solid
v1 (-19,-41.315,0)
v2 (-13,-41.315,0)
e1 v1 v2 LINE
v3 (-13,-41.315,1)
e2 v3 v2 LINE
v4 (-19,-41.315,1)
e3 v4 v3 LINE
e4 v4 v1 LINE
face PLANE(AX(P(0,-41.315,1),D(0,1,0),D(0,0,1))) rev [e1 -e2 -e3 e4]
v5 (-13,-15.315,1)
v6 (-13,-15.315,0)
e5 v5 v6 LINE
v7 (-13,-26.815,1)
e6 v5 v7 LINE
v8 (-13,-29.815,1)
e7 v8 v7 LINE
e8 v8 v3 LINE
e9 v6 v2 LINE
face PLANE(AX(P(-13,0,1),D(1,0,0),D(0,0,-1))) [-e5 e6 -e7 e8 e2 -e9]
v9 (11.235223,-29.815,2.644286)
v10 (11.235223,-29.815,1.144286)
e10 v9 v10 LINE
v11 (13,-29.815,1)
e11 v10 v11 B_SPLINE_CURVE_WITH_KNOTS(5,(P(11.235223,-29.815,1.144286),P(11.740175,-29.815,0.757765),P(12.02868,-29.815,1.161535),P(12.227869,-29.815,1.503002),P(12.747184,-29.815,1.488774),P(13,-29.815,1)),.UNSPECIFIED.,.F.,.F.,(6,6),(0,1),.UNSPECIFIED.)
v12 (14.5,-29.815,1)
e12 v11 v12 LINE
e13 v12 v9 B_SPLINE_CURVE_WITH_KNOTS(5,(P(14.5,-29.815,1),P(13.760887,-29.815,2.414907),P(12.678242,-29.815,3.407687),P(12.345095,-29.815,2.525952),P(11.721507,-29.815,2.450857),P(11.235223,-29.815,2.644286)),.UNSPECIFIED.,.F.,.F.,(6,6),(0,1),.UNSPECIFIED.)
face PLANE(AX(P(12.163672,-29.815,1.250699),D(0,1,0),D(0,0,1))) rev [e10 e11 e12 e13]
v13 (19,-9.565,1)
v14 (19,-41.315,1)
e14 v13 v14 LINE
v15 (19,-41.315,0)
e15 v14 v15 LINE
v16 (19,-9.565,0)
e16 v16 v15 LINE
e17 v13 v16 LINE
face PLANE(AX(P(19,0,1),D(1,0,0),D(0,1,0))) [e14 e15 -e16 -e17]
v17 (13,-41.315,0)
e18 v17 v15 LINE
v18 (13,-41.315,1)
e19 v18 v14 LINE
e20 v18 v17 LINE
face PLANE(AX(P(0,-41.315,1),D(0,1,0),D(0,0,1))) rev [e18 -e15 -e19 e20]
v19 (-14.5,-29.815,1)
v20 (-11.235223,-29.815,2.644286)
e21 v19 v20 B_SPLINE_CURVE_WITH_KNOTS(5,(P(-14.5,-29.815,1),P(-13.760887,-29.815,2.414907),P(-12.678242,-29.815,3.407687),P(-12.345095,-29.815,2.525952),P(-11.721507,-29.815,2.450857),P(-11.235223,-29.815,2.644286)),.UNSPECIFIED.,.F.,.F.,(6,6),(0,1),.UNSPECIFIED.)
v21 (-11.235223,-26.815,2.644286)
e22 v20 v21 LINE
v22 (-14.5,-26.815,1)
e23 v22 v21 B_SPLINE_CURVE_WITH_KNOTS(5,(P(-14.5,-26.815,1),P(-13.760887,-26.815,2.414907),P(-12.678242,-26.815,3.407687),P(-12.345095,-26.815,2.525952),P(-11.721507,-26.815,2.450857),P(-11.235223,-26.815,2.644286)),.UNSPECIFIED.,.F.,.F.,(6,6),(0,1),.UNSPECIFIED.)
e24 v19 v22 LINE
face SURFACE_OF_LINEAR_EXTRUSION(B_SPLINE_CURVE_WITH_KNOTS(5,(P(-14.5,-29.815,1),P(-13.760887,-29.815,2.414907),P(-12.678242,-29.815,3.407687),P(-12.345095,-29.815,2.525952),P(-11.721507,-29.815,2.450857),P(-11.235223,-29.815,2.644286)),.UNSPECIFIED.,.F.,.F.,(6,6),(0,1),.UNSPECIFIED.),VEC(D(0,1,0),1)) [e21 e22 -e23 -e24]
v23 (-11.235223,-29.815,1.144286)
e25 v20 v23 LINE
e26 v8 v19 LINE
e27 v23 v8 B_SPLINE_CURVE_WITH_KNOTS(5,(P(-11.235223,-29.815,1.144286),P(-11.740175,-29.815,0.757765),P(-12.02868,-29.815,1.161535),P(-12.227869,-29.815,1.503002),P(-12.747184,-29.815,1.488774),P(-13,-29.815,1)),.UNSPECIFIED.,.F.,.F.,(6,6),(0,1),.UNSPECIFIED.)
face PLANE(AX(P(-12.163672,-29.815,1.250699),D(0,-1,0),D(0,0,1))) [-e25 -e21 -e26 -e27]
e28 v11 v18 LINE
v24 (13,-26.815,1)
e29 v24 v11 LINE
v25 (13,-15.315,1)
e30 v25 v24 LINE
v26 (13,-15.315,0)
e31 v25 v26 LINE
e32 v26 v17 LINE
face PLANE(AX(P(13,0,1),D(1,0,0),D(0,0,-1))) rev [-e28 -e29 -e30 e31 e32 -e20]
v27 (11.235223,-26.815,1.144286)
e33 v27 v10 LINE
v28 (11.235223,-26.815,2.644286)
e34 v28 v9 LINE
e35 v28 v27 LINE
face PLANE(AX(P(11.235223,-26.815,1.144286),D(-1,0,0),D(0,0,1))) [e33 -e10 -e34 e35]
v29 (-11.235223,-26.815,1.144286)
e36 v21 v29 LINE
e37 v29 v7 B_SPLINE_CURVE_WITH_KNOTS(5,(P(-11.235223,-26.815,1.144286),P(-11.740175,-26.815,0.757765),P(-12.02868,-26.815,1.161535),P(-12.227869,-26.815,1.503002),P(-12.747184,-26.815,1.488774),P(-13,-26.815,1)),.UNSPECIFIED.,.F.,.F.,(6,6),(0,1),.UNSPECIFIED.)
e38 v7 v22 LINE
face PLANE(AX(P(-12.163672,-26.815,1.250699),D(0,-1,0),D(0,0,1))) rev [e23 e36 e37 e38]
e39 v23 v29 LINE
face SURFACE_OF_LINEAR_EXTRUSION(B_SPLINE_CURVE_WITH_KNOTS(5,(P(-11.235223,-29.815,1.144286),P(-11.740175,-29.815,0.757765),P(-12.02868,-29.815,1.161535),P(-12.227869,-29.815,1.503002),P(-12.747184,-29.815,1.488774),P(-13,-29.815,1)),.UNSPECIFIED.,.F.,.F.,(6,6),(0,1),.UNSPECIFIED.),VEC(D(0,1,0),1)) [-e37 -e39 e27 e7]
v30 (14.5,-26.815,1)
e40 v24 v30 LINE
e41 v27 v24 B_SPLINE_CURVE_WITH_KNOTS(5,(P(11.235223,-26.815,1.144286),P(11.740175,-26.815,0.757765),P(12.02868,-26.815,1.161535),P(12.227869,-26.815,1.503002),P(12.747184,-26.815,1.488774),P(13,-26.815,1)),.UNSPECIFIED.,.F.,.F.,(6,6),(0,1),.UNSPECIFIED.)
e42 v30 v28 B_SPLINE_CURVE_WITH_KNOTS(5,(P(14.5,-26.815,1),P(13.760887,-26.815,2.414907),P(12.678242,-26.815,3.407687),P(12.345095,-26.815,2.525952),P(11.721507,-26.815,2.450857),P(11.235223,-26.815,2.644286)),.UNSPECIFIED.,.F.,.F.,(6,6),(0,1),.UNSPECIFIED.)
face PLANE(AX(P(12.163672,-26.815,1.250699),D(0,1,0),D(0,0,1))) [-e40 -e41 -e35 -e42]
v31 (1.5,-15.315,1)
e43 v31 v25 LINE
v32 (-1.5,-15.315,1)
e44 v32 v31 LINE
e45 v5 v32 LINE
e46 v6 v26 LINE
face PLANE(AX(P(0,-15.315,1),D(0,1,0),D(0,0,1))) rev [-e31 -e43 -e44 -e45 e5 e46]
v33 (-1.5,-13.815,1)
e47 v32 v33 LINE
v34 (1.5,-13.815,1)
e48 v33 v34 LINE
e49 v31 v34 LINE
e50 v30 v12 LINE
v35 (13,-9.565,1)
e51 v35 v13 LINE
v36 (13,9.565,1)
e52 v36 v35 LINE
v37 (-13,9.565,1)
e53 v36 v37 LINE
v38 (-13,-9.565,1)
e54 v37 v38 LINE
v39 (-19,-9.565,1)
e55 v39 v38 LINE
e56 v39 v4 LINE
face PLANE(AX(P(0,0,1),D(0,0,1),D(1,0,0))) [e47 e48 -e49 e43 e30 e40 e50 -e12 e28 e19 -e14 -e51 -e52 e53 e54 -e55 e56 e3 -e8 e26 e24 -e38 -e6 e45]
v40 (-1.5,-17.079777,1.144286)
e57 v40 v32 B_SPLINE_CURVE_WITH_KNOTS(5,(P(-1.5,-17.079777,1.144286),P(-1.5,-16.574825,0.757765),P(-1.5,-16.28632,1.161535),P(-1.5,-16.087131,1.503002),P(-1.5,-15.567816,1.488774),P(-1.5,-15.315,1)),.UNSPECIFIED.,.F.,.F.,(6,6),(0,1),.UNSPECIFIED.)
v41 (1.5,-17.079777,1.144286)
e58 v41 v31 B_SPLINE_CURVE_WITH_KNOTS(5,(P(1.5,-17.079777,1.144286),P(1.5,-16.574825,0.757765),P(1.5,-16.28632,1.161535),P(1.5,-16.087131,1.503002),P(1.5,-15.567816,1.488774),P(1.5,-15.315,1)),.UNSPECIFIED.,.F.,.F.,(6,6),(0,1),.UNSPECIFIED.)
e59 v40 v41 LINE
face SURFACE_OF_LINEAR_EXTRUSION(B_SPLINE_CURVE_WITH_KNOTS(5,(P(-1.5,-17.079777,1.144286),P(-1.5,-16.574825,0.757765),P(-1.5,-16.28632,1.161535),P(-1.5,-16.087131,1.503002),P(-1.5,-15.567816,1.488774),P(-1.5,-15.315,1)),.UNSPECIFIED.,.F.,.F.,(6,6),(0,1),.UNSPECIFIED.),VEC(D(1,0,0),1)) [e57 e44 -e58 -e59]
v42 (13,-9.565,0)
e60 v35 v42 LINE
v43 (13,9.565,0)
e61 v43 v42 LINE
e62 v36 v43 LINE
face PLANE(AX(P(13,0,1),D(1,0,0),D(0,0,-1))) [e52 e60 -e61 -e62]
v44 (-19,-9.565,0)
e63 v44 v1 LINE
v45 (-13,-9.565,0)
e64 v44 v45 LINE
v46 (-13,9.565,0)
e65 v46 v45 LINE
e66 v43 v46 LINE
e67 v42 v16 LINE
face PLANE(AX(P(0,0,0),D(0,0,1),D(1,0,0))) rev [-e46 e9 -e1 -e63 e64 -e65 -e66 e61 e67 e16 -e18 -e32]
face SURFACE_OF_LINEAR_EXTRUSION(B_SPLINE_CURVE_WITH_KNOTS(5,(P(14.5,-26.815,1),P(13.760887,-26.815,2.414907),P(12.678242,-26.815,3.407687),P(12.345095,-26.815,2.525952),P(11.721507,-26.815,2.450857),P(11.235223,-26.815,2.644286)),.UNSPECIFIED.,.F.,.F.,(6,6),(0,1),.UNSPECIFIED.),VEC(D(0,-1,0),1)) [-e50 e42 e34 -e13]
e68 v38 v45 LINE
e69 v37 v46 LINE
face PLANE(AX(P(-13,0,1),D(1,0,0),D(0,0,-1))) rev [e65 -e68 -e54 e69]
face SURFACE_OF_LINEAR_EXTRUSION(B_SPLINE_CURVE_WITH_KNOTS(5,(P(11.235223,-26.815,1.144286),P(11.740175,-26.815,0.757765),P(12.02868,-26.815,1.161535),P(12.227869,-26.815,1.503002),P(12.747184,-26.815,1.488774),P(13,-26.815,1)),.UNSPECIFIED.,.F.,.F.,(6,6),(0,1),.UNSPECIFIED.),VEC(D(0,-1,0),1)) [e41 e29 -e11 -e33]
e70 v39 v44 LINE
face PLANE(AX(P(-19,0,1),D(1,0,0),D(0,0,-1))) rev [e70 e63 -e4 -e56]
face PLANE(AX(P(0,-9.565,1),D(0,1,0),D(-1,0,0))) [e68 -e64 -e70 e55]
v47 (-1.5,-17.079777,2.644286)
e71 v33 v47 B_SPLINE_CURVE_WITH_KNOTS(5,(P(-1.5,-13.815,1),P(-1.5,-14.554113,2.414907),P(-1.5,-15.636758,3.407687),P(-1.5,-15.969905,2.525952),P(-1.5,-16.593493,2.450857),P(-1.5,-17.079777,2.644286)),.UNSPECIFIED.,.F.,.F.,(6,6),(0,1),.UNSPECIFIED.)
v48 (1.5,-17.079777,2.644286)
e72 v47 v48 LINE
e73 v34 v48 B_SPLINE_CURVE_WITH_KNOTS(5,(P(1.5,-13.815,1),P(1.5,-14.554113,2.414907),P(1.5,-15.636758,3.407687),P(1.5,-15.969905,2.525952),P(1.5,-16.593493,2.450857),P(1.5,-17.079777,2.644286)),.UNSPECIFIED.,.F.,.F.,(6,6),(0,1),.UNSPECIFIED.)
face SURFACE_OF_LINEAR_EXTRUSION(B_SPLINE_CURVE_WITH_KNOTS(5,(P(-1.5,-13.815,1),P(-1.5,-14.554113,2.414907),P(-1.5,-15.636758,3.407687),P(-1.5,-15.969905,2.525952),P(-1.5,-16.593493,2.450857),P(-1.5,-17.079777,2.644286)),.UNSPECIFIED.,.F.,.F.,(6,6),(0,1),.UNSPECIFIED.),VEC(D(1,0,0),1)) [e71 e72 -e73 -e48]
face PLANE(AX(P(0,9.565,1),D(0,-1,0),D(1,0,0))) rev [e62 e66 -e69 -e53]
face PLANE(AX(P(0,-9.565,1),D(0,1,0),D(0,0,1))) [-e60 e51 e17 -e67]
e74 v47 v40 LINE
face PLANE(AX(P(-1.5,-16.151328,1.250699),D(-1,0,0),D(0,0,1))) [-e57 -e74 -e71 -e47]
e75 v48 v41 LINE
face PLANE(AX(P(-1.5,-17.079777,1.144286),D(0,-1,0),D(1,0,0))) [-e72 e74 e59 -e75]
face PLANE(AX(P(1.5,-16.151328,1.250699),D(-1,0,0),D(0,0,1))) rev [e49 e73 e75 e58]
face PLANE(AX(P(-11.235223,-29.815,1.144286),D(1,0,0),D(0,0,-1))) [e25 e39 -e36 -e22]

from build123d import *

# Parameters (mm, degrees)
BOSS_EXTRUDE1_DEPTH = 1
BOSS_EXTRUDE2_START = -1.5
BOSS_EXTRUDE2_DEPTH = 3
CIRPATTERN1_COUNT   = 3
CIRPATTERN1_ANGLE   = 180


# Read off the part's stored shape, not the designer's step: Boss-Extrude2
with BuildPart() as part:
    # Sketch1 → Boss-Extrude1 (new body)
    with BuildSketch(Plane.XY):
        Polygon((13, -9.565), (13, 9.565), (-13, 9.565), (-13, -9.565), (-19, -9.565), (-19, -41.315), (-13, -41.315), (-13, -15.315), (13, -15.315), (13, -41.315), (19, -41.315), (19, -9.565), align=None)
    extrude(amount=BOSS_EXTRUDE1_DEPTH)

    # Boss-Extrude2 outline → Boss-Extrude2 (add)
    with BuildSketch(Plane(origin=(0, -28.315, 0), x_dir=(-1, 0, 0), z_dir=(0, -1, 0)).offset(BOSS_EXTRUDE2_START)):
        with BuildLine():
            Line((-11.23522271, -2.644286359), (-11.23522271, -1.144286359))
            add(Edge.make_bspline(
                [(-11.23522271, -1.144286359), (-11.740174878, -0.757764956), (-12.028679887, -1.161534837), (-12.227869222, -1.503002268), (-12.747184273, -1.488774458), (-13, -1)],
                knots=[0, 0, 0, 0, 0, 0, 1, 1, 1, 1, 1, 1], degree=5))
            Line((-13, -1), (-14.5, -1))
            add(Edge.make_bspline(
                [(-14.5, -1), (-13.760887065, -2.414906572), (-12.67824158, -3.40768712), (-12.345095428, -2.525951835), (-11.7215069, -2.450856602), (-11.23522271, -2.644286359)],
                knots=[0, 0, 0, 0, 0, 0, 1, 1, 1, 1, 1, 1], degree=5))
        make_face()
    boss_extrude2 = extrude(amount=BOSS_EXTRUDE2_DEPTH)

    # CirPattern1: Boss-Extrude2 ×3 about axis
    cirpattern1_axis = Axis((0, -28.315, 1.05), (0, 0, 1))
    for i in range(1, CIRPATTERN1_COUNT):
        add(boss_extrude2.rotate(cirpattern1_axis, i * CIRPATTERN1_ANGLE / (CIRPATTERN1_COUNT - 1)))


solid = part.part
